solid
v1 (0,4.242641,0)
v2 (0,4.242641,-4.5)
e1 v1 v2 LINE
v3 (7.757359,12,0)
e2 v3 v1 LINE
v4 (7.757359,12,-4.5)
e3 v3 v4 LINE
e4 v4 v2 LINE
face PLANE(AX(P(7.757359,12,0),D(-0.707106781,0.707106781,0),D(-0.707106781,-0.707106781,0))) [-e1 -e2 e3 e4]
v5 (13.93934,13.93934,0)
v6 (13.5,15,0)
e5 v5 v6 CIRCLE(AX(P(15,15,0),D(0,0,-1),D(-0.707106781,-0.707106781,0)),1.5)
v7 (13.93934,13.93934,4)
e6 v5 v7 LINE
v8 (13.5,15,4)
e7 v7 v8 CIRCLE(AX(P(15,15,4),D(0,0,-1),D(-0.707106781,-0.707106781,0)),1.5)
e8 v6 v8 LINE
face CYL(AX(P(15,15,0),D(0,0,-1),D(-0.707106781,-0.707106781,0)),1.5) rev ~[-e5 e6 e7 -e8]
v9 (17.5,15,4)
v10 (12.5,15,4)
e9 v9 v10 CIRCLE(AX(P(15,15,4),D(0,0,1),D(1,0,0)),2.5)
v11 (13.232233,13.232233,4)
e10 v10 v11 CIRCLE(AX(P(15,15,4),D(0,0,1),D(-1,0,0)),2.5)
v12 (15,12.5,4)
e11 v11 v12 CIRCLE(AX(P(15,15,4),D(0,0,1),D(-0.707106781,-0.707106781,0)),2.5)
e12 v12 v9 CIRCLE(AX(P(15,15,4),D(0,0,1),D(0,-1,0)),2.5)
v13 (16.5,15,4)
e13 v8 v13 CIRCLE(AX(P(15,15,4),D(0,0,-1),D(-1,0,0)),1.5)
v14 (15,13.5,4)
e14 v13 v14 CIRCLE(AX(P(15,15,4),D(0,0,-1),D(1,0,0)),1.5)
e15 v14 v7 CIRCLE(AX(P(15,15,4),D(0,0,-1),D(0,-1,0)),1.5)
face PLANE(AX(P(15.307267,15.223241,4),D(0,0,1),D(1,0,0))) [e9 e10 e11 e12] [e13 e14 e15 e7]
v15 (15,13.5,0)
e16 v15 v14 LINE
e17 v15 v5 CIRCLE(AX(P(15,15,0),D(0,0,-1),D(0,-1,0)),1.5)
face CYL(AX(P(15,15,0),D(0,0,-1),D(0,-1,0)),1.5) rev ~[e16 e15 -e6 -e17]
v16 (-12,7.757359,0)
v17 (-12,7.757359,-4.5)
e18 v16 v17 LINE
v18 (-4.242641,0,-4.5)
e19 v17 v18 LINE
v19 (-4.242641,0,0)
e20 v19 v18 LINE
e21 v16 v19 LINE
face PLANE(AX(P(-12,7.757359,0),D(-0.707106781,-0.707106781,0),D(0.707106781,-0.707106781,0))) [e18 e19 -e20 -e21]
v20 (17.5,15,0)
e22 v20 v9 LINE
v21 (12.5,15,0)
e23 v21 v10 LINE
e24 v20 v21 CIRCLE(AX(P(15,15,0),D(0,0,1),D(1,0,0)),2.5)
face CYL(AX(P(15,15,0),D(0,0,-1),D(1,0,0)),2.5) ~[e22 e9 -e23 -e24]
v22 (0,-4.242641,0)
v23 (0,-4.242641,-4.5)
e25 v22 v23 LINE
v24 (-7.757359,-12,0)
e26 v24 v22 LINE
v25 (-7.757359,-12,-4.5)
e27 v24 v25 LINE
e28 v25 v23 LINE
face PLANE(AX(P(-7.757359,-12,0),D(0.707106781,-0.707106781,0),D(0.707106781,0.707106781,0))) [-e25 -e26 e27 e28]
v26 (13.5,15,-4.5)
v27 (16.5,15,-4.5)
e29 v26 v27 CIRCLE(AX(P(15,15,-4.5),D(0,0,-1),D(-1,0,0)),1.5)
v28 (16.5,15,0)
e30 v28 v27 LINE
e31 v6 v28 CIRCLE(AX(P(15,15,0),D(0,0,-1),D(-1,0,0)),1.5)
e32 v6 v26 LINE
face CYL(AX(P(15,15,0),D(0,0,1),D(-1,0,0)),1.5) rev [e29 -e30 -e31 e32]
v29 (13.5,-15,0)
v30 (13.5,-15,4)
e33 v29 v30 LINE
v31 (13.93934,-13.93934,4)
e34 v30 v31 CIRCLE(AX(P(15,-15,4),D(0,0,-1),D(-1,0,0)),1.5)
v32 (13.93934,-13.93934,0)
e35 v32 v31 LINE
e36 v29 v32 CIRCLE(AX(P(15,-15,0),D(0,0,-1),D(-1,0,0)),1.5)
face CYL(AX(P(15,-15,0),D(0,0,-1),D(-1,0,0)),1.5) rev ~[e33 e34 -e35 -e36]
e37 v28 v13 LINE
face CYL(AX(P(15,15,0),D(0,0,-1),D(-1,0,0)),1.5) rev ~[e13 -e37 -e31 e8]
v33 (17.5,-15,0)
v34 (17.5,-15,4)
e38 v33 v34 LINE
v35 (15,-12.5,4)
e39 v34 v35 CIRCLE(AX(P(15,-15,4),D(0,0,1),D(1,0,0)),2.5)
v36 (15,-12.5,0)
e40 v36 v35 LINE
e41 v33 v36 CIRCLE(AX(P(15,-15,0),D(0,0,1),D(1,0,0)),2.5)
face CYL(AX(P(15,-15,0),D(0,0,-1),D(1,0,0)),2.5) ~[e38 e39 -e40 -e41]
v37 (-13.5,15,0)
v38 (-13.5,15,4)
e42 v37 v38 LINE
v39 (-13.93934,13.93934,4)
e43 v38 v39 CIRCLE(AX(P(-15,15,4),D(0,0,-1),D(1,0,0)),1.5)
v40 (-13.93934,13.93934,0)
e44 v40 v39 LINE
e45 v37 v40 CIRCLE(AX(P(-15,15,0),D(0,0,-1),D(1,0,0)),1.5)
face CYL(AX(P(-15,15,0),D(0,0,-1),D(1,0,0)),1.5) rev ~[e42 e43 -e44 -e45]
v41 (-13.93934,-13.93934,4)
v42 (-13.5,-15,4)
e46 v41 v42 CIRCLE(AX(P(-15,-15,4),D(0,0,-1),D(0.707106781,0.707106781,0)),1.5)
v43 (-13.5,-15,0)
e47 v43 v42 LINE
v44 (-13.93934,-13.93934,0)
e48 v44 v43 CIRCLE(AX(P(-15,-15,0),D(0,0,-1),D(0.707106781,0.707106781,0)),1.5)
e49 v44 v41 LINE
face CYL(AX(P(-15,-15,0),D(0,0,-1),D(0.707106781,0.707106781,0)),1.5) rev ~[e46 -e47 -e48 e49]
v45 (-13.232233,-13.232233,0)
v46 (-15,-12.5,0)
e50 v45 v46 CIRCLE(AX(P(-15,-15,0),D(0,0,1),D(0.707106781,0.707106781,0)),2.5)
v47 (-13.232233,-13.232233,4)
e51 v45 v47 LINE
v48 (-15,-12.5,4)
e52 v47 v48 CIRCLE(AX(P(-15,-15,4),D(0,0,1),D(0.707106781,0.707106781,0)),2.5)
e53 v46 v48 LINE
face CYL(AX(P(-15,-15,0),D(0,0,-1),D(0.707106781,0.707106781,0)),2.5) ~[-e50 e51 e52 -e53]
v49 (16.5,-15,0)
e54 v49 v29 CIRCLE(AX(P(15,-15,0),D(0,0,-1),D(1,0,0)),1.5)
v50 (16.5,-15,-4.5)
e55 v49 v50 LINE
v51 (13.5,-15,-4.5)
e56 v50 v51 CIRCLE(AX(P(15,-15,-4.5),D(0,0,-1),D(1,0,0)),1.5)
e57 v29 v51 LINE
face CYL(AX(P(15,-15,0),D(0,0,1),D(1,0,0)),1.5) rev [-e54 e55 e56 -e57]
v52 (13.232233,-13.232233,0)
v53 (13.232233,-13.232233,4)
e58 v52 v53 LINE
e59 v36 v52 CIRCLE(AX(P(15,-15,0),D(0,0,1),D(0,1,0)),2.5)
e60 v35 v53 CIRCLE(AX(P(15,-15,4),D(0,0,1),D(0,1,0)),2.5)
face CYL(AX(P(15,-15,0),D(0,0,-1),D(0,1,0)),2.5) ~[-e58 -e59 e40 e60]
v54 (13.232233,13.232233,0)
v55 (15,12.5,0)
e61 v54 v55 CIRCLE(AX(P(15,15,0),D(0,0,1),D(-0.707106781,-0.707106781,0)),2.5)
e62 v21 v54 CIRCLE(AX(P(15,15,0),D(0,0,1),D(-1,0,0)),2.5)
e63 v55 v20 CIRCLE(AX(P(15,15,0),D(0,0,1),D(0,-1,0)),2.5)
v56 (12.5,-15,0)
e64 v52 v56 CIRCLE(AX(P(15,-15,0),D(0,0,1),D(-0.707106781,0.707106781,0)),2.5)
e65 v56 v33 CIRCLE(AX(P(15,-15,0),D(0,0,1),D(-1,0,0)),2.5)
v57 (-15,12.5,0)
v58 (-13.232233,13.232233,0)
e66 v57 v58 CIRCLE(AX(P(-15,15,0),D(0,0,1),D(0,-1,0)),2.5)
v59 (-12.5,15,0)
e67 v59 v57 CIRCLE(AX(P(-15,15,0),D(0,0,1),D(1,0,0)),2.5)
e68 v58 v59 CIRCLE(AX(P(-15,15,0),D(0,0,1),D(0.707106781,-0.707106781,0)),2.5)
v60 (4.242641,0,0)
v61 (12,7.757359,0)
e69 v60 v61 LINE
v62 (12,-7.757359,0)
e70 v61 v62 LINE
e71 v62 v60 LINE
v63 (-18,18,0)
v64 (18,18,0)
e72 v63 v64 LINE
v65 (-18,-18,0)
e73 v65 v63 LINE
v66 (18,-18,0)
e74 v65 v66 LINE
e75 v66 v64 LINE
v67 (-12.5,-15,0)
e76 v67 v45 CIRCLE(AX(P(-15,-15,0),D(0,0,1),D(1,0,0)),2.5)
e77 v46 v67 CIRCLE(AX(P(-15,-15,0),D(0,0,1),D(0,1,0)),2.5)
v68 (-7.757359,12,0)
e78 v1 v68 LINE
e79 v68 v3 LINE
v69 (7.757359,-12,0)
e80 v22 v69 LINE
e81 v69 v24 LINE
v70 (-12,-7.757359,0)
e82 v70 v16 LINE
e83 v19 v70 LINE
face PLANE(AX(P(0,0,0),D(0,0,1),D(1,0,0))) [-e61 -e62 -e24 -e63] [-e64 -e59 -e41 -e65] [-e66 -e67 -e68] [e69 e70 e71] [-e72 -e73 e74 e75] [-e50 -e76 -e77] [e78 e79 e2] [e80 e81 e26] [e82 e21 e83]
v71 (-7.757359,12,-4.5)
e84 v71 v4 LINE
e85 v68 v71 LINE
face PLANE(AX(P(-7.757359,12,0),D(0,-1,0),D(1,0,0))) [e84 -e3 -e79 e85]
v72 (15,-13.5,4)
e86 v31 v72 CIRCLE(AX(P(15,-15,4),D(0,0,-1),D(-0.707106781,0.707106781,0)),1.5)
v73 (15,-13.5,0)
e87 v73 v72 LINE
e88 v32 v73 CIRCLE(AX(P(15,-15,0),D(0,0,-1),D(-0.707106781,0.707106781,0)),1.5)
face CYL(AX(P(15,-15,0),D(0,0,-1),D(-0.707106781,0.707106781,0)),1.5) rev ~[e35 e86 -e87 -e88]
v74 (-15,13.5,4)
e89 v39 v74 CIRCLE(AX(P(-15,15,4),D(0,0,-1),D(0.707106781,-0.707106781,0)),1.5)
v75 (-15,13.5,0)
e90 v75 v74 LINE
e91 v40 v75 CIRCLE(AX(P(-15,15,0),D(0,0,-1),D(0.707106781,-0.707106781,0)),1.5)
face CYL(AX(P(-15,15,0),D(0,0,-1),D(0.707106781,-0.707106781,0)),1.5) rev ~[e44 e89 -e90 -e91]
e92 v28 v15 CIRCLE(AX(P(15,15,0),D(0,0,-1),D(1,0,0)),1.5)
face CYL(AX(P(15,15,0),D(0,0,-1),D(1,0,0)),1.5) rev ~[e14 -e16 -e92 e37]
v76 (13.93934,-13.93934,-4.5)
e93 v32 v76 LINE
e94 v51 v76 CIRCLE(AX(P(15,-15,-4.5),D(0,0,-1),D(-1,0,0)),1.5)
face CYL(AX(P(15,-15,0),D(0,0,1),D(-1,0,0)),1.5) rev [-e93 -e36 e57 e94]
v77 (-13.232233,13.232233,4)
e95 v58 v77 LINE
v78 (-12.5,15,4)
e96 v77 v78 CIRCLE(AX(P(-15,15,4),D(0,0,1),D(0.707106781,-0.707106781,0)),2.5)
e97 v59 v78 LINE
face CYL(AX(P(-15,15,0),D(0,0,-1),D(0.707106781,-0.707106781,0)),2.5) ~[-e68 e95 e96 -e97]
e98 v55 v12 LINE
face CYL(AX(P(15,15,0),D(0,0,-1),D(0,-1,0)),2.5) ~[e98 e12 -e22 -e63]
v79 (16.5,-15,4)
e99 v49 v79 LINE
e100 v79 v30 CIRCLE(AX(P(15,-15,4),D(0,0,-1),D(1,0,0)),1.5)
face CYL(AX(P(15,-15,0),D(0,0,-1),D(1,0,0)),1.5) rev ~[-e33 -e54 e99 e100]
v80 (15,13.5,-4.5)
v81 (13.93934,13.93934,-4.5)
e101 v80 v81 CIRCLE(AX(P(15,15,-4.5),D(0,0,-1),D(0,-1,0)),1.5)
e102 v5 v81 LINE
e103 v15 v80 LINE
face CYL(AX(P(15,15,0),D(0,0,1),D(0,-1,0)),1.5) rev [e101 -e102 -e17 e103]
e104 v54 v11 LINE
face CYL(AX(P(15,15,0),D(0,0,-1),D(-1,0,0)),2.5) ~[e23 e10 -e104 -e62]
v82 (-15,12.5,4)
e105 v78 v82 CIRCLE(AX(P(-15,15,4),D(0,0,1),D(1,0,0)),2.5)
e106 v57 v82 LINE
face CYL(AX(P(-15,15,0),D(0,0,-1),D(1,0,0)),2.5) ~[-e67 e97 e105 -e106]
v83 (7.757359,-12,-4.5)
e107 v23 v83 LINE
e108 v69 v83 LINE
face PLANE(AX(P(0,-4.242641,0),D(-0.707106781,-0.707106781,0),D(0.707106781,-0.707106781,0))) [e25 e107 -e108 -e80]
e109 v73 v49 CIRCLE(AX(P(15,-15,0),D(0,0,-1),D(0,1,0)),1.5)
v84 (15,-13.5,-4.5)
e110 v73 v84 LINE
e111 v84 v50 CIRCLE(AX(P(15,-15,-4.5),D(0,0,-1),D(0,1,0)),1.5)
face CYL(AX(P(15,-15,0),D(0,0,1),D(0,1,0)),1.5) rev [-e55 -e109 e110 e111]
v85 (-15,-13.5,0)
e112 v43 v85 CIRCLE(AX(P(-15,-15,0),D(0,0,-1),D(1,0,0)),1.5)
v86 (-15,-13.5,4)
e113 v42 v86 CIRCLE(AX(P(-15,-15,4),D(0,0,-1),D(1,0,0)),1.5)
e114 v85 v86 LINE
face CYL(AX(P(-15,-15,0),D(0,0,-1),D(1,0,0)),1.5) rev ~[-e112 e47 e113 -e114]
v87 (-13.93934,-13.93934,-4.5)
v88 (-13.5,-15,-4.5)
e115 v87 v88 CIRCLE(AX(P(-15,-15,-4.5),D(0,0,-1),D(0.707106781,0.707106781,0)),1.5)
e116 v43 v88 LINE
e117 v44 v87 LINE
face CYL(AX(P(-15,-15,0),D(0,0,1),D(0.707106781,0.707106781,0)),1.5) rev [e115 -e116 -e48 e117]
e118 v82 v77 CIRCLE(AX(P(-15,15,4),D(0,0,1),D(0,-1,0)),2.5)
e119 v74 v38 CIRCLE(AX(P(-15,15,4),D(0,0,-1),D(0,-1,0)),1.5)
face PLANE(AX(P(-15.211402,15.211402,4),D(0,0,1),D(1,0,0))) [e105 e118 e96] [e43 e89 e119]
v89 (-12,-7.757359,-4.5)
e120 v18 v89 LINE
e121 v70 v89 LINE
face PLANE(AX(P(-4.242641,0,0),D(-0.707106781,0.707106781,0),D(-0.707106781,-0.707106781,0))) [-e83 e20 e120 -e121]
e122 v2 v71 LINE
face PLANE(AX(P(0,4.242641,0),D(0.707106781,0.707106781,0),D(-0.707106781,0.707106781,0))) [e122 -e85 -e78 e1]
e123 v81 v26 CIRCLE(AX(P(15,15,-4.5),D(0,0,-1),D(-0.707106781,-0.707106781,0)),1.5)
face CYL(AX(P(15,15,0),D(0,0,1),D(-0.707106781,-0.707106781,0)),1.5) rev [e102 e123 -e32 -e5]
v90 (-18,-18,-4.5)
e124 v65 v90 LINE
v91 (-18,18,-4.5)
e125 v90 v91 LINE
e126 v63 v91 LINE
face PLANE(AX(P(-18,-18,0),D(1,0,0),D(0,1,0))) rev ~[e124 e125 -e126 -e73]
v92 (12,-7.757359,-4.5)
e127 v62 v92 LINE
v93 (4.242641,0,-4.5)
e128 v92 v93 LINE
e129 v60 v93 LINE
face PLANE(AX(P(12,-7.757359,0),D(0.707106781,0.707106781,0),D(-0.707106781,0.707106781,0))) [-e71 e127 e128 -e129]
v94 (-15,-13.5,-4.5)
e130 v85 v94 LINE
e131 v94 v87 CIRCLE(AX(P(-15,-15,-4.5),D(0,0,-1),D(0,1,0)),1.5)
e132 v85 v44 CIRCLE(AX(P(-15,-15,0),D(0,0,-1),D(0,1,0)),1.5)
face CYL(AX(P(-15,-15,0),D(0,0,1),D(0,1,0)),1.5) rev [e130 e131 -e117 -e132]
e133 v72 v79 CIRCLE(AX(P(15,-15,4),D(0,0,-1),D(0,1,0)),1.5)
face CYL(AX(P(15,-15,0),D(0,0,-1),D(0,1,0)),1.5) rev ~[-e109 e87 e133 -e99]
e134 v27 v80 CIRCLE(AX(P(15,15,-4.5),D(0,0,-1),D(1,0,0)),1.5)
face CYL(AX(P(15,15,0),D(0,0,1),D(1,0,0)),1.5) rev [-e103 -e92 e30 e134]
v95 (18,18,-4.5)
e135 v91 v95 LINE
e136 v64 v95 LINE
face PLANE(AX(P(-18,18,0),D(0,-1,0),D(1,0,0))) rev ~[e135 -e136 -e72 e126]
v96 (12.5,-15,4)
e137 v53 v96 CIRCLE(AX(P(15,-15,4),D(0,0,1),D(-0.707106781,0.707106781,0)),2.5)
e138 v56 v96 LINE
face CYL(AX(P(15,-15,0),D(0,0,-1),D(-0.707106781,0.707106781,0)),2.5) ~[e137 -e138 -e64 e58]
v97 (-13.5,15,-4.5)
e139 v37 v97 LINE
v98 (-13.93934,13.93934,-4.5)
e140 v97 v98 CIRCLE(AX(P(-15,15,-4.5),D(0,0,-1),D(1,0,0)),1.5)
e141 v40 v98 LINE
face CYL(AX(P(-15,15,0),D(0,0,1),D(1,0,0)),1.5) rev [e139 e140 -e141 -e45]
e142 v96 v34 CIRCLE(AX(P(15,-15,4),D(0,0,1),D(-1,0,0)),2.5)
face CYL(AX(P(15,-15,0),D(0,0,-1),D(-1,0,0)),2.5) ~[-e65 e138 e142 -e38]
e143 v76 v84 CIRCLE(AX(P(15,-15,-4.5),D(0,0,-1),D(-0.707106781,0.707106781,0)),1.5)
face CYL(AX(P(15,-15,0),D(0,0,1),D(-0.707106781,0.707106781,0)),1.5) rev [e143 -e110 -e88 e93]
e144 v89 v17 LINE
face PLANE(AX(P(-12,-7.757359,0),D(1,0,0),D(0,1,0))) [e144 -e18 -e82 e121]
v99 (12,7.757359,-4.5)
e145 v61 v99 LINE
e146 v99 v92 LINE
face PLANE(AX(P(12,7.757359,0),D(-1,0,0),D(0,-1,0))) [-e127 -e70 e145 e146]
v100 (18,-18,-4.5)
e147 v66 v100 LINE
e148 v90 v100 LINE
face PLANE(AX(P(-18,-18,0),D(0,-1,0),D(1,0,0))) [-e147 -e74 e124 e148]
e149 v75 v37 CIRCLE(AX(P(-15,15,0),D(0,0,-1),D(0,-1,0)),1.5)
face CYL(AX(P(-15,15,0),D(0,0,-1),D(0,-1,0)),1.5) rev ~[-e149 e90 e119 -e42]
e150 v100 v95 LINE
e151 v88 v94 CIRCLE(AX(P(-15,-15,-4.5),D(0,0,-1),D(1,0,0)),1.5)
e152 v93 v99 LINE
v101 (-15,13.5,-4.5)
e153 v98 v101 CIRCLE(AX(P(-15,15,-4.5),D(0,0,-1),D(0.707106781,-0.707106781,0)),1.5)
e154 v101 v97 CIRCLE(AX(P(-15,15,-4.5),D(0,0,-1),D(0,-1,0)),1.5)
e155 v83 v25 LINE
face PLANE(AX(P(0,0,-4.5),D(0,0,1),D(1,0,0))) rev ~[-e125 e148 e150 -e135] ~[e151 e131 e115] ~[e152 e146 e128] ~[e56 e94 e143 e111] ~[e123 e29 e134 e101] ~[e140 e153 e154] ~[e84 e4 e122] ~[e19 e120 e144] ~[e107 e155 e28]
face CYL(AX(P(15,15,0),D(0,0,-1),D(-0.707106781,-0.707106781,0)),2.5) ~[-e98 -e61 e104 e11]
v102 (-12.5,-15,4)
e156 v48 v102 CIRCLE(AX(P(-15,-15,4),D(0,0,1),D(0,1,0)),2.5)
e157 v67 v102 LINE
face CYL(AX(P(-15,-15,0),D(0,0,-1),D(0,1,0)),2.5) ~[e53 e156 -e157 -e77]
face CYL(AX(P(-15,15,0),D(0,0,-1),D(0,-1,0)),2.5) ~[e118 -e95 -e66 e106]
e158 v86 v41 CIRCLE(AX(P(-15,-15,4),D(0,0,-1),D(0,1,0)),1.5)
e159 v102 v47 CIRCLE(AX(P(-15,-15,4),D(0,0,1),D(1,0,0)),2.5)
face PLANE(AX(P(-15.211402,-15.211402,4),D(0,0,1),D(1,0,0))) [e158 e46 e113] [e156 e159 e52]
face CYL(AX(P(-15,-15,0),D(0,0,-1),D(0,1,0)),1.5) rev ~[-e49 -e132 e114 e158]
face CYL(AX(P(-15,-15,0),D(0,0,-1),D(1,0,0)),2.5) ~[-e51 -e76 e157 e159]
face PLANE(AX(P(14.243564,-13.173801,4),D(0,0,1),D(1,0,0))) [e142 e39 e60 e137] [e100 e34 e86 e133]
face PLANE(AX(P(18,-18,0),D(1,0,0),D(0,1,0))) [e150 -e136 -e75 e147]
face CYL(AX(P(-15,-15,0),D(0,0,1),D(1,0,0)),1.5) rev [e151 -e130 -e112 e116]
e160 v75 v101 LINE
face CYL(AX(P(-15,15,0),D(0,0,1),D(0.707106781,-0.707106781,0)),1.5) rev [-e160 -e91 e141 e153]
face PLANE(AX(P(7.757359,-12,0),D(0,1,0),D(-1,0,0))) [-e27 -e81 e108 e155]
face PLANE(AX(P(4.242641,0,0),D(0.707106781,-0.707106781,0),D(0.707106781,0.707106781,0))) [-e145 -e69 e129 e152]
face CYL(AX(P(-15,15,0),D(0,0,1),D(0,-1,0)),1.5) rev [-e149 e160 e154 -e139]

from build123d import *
from build123d import SkipClean  # not in build123d's __all__

# Parameters (mm, degrees)
F1_W     = 36
F1_H     = 36
F2_DEPTH = 4.5
F3_DEPTH = 4


with BuildPart() as f2:
    # F1 (on Top) → F2 (new body)
    with BuildSketch(Plane.XY):
        Rectangle(F1_W, F1_H)
        with BuildLine():
            ThreePointArc((-15, 12.5), (-16.767766953, 16.767766953), (-12.5, 15))
            Line((-12.5, 15), (12.5, 15))
            ThreePointArc((12.5, 15), (15, 17.5), (17.5, 15))
            ThreePointArc((17.5, 15), (16.767766953, 13.232233047), (15, 12.5))
            Line((15, 12.5), (15, -12.5))
            ThreePointArc((15, -12.5), (16.767766953, -13.232233047), (17.5, -15))
            ThreePointArc((17.5, -15), (15, -17.5), (12.5, -15))
            Line((12.5, -15), (-12.5, -15))
            ThreePointArc((-12.5, -15), (-16.767766953, -16.767766953), (-15, -12.5))
            Line((-15, -12.5), (-15, 12.5))
        make_face(mode=Mode.SUBTRACT)
        with BuildLine():
            ThreePointArc((-13.232233047, 13.232233047), (-14.0432914191, 12.6903011687), (-15, 12.5))
            Line((-15, 12.5), (-15, -12.5))
            ThreePointArc((-15, -12.5), (-14.0432914191, -12.6903011687), (-13.232233047, -13.232233047))
            Line((-13.232233047, -13.232233047), (-12, -12))
            Line((-12, -12), (-12, -7.7573593129))
            Line((-12, -7.7573593129), (-12, 7.7573593129))
            Line((-12, 7.7573593129), (-12, 12))
            Line((-12, 12), (-13.232233047, 13.232233047))
        make_face()
        with BuildLine():
            Line((12.5, 15), (-12.5, 15))
            ThreePointArc((-12.5, 15), (-12.6903011687, 14.0432914191), (-13.232233047, 13.232233047))
            Line((-13.232233047, 13.232233047), (-12, 12))
            Line((-12, 12), (-7.7573593129, 12))
            Line((-7.7573593129, 12), (7.7573593129, 12))
            Line((7.7573593129, 12), (12, 12))
            Line((12, 12), (13.232233047, 13.232233047))
            ThreePointArc((13.232233047, 13.232233047), (12.6903011687, 14.0432914191), (12.5, 15))
        make_face()
        with BuildLine():
            Line((-12, -12), (-13.232233047, -13.232233047))
            ThreePointArc((-13.232233047, -13.232233047), (-12.6903011687, -14.0432914191), (-12.5, -15))
            Line((-12.5, -15), (12.5, -15))
            ThreePointArc((12.5, -15), (12.6903011687, -14.0432914191), (13.232233047, -13.232233047))
            Line((13.232233047, -13.232233047), (12, -12))
            Line((12, -12), (7.7573593129, -12))
            Line((7.7573593129, -12), (-7.7573593129, -12))
            Line((-7.7573593129, -12), (-12, -12))
        make_face()
        with BuildLine():
            ThreePointArc((15, 12.5), (14.0432914191, 12.6903011687), (13.232233047, 13.232233047))
            Line((13.232233047, 13.232233047), (12, 12))
            Line((12, 12), (12, 7.7573593129))
            Line((12, 7.7573593129), (12, -7.7573593129))
            Line((12, -7.7573593129), (12, -12))
            Line((12, -12), (13.232233047, -13.232233047))
            ThreePointArc((13.232233047, -13.232233047), (14.0432914191, -12.6903011687), (15, -12.5))
            Line((15, -12.5), (15, 12.5))
        make_face()
        Polygon((0, 0), (-12, 12), (-12, 7.7573593129), (-4.2426406871, 0), (-2.1213203436, -2.1213203436), align=None)
        Polygon((-7.7573593129, 12), (-12, 12), (0, 0), (2.1213203436, 2.1213203436), (0, 4.2426406871), align=None)
        Polygon((2.1213203436, 2.1213203436), (0, 0), (12, -12), (12, -7.7573593129), (4.2426406871, 0), align=None)
        Polygon((12, -12), (0, 0), (-2.1213203436, -2.1213203436), (0, -4.2426406871), (7.7573593129, -12), align=None)
        Polygon((-2.1213203436, -2.1213203436), (-12, -12), (-7.7573593129, -12), (0, -4.2426406871), align=None)
        Polygon((-12, -7.7573593129), (-12, -12), (-2.1213203436, -2.1213203436), (-4.2426406871, 0), align=None)
        Polygon((2.1213203436, 2.1213203436), (12, 12), (7.7573593129, 12), (0, 4.2426406871), align=None)
        Polygon((12, 7.7573593129), (12, 12), (2.1213203436, 2.1213203436), (4.2426406871, 0), align=None)
        with BuildLine():
            Line((-13.5, 15), (-12.5, 15))
            ThreePointArc((-12.5, 15), (-16.767766953, 16.767766953), (-15, 12.5))
            Line((-15, 12.5), (-15, 13.5))
            ThreePointArc((-15, 13.5), (-16.0606601718, 16.0606601718), (-13.5, 15))
        make_face()
        with BuildLine():
            ThreePointArc((17.5, 15), (15, 17.5), (12.5, 15))
            Line((12.5, 15), (13.5, 15))
            ThreePointArc((13.5, 15), (15, 16.5), (16.5, 15))
            ThreePointArc((16.5, 15), (16.0606601718, 13.9393398282), (15, 13.5))
            Line((15, 13.5), (15, 12.5))
            ThreePointArc((15, 12.5), (16.767766953, 13.232233047), (17.5, 15))
        make_face()
        with BuildLine():
            ThreePointArc((17.5, -15), (16.767766953, -13.232233047), (15, -12.5))
            Line((15, -12.5), (15, -13.5))
            ThreePointArc((15, -13.5), (16.0606601718, -13.9393398282), (16.5, -15))
            ThreePointArc((16.5, -15), (15, -16.5), (13.5, -15))
            Line((13.5, -15), (12.5, -15))
            ThreePointArc((12.5, -15), (15, -17.5), (17.5, -15))
        make_face()
        with BuildLine():
            Line((-15, -13.5), (-15, -12.5))
            ThreePointArc((-15, -12.5), (-16.767766953, -16.767766953), (-12.5, -15))
            Line((-12.5, -15), (-13.5, -15))
            ThreePointArc((-13.5, -15), (-16.0606601718, -16.0606601718), (-15, -13.5))
        make_face()
        with BuildLine():
            Line((-15, 13.5), (-15, 12.5))
            ThreePointArc((-15, 12.5), (-14.0432914191, 12.6903011687), (-13.232233047, 13.232233047))
            Line((-13.232233047, 13.232233047), (-13.9393398282, 13.9393398282))
            ThreePointArc((-13.9393398282, 13.9393398282), (-14.4259748515, 13.6141807012), (-15, 13.5))
        make_face()
        with BuildLine():
            ThreePointArc((-13.232233047, 13.232233047), (-12.6903011687, 14.0432914191), (-12.5, 15))
            Line((-12.5, 15), (-13.5, 15))
            ThreePointArc((-13.5, 15), (-13.6141807012, 14.4259748515), (-13.9393398282, 13.9393398282))
            Line((-13.9393398282, 13.9393398282), (-13.232233047, 13.232233047))
        make_face()
        with BuildLine():
            Line((13.9393398282, 13.9393398282), (13.232233047, 13.232233047))
            ThreePointArc((13.232233047, 13.232233047), (14.0432914191, 12.6903011687), (15, 12.5))
            Line((15, 12.5), (15, 13.5))
            ThreePointArc((15, 13.5), (14.4259748515, 13.6141807012), (13.9393398282, 13.9393398282))
        make_face()
        with BuildLine():
            Line((13.5, 15), (12.5, 15))
            ThreePointArc((12.5, 15), (12.6903011687, 14.0432914191), (13.232233047, 13.232233047))
            Line((13.232233047, 13.232233047), (13.9393398282, 13.9393398282))
            ThreePointArc((13.9393398282, 13.9393398282), (13.6141807012, 14.4259748515), (13.5, 15))
        make_face()
        with BuildLine():
            ThreePointArc((13.232233047, -13.232233047), (12.6903011687, -14.0432914191), (12.5, -15))
            Line((12.5, -15), (13.5, -15))
            ThreePointArc((13.5, -15), (13.6141807012, -14.4259748515), (13.9393398282, -13.9393398282))
            Line((13.9393398282, -13.9393398282), (13.232233047, -13.232233047))
        make_face()
        with BuildLine():
            Line((15, -13.5), (15, -12.5))
            ThreePointArc((15, -12.5), (14.0432914191, -12.6903011687), (13.232233047, -13.232233047))
            Line((13.232233047, -13.232233047), (13.9393398282, -13.9393398282))
            ThreePointArc((13.9393398282, -13.9393398282), (14.4259748515, -13.6141807012), (15, -13.5))
        make_face()
        with BuildLine():
            ThreePointArc((-12.5, -15), (-12.6903011687, -14.0432914191), (-13.232233047, -13.232233047))
            Line((-13.232233047, -13.232233047), (-13.9393398282, -13.9393398282))
            ThreePointArc((-13.9393398282, -13.9393398282), (-13.6141807012, -14.4259748515), (-13.5, -15))
            Line((-13.5, -15), (-12.5, -15))
        make_face()
        with BuildLine():
            ThreePointArc((-13.232233047, -13.232233047), (-14.0432914191, -12.6903011687), (-15, -12.5))
            Line((-15, -12.5), (-15, -13.5))
            ThreePointArc((-15, -13.5), (-14.4259748515, -13.6141807012), (-13.9393398282, -13.9393398282))
            Line((-13.9393398282, -13.9393398282), (-13.232233047, -13.232233047))
        make_face()
    extrude(amount=-F2_DEPTH)

    # F1 (on Top) → F3 (join)
    with BuildSketch(Plane.XY):
        with BuildLine():
            Line((-13.5, 15), (-12.5, 15))
            ThreePointArc((-12.5, 15), (-16.767766953, 16.767766953), (-15, 12.5))
            Line((-15, 12.5), (-15, 13.5))
            ThreePointArc((-15, 13.5), (-16.0606601718, 16.0606601718), (-13.5, 15))
        make_face()
        with BuildLine():
            Line((-15, 13.5), (-15, 12.5))
            ThreePointArc((-15, 12.5), (-14.0432914191, 12.6903011687), (-13.232233047, 13.232233047))
            Line((-13.232233047, 13.232233047), (-13.9393398282, 13.9393398282))
            ThreePointArc((-13.9393398282, 13.9393398282), (-14.4259748515, 13.6141807012), (-15, 13.5))
        make_face()
        with BuildLine():
            ThreePointArc((-13.232233047, 13.232233047), (-12.6903011687, 14.0432914191), (-12.5, 15))
            Line((-12.5, 15), (-13.5, 15))
            ThreePointArc((-13.5, 15), (-13.6141807012, 14.4259748515), (-13.9393398282, 13.9393398282))
            Line((-13.9393398282, 13.9393398282), (-13.232233047, 13.232233047))
        make_face()
        with BuildLine():
            ThreePointArc((17.5, 15), (15, 17.5), (12.5, 15))
            Line((12.5, 15), (13.5, 15))
            ThreePointArc((13.5, 15), (15, 16.5), (16.5, 15))
            ThreePointArc((16.5, 15), (16.0606601718, 13.9393398282), (15, 13.5))
            Line((15, 13.5), (15, 12.5))
            ThreePointArc((15, 12.5), (16.767766953, 13.232233047), (17.5, 15))
        make_face()
        with BuildLine():
            Line((13.9393398282, 13.9393398282), (13.232233047, 13.232233047))
            ThreePointArc((13.232233047, 13.232233047), (14.0432914191, 12.6903011687), (15, 12.5))
            Line((15, 12.5), (15, 13.5))
            ThreePointArc((15, 13.5), (14.4259748515, 13.6141807012), (13.9393398282, 13.9393398282))
        make_face()
        with BuildLine():
            Line((13.5, 15), (12.5, 15))
            ThreePointArc((12.5, 15), (12.6903011687, 14.0432914191), (13.232233047, 13.232233047))
            Line((13.232233047, 13.232233047), (13.9393398282, 13.9393398282))
            ThreePointArc((13.9393398282, 13.9393398282), (13.6141807012, 14.4259748515), (13.5, 15))
        make_face()
        with BuildLine():
            Line((-15, -13.5), (-15, -12.5))
            ThreePointArc((-15, -12.5), (-16.767766953, -16.767766953), (-12.5, -15))
            Line((-12.5, -15), (-13.5, -15))
            ThreePointArc((-13.5, -15), (-16.0606601718, -16.0606601718), (-15, -13.5))
        make_face()
        with BuildLine():
            ThreePointArc((-13.232233047, -13.232233047), (-14.0432914191, -12.6903011687), (-15, -12.5))
            Line((-15, -12.5), (-15, -13.5))
            ThreePointArc((-15, -13.5), (-14.4259748515, -13.6141807012), (-13.9393398282, -13.9393398282))
            Line((-13.9393398282, -13.9393398282), (-13.232233047, -13.232233047))
        make_face()
        with BuildLine():
            ThreePointArc((-12.5, -15), (-12.6903011687, -14.0432914191), (-13.232233047, -13.232233047))
            Line((-13.232233047, -13.232233047), (-13.9393398282, -13.9393398282))
            ThreePointArc((-13.9393398282, -13.9393398282), (-13.6141807012, -14.4259748515), (-13.5, -15))
            Line((-13.5, -15), (-12.5, -15))
        make_face()
        with BuildLine():
            Line((15, -13.5), (15, -12.5))
            ThreePointArc((15, -12.5), (14.0432914191, -12.6903011687), (13.232233047, -13.232233047))
            Line((13.232233047, -13.232233047), (13.9393398282, -13.9393398282))
            ThreePointArc((13.9393398282, -13.9393398282), (14.4259748515, -13.6141807012), (15, -13.5))
        make_face()
        with BuildLine():
            ThreePointArc((13.232233047, -13.232233047), (12.6903011687, -14.0432914191), (12.5, -15))
            Line((12.5, -15), (13.5, -15))
            ThreePointArc((13.5, -15), (13.6141807012, -14.4259748515), (13.9393398282, -13.9393398282))
            Line((13.9393398282, -13.9393398282), (13.232233047, -13.232233047))
        make_face()
        with BuildLine():
            ThreePointArc((17.5, -15), (16.767766953, -13.232233047), (15, -12.5))
            Line((15, -12.5), (15, -13.5))
            ThreePointArc((15, -13.5), (16.0606601718, -13.9393398282), (16.5, -15))
            ThreePointArc((16.5, -15), (15, -16.5), (13.5, -15))
            Line((13.5, -15), (12.5, -15))
            ThreePointArc((12.5, -15), (15, -17.5), (17.5, -15))
        make_face()
    with SkipClean():  # cleaning this boolean's faces spoils the solid; the shape is the same uncleaned
        extrude(amount=F3_DEPTH)


solid = f2.part
